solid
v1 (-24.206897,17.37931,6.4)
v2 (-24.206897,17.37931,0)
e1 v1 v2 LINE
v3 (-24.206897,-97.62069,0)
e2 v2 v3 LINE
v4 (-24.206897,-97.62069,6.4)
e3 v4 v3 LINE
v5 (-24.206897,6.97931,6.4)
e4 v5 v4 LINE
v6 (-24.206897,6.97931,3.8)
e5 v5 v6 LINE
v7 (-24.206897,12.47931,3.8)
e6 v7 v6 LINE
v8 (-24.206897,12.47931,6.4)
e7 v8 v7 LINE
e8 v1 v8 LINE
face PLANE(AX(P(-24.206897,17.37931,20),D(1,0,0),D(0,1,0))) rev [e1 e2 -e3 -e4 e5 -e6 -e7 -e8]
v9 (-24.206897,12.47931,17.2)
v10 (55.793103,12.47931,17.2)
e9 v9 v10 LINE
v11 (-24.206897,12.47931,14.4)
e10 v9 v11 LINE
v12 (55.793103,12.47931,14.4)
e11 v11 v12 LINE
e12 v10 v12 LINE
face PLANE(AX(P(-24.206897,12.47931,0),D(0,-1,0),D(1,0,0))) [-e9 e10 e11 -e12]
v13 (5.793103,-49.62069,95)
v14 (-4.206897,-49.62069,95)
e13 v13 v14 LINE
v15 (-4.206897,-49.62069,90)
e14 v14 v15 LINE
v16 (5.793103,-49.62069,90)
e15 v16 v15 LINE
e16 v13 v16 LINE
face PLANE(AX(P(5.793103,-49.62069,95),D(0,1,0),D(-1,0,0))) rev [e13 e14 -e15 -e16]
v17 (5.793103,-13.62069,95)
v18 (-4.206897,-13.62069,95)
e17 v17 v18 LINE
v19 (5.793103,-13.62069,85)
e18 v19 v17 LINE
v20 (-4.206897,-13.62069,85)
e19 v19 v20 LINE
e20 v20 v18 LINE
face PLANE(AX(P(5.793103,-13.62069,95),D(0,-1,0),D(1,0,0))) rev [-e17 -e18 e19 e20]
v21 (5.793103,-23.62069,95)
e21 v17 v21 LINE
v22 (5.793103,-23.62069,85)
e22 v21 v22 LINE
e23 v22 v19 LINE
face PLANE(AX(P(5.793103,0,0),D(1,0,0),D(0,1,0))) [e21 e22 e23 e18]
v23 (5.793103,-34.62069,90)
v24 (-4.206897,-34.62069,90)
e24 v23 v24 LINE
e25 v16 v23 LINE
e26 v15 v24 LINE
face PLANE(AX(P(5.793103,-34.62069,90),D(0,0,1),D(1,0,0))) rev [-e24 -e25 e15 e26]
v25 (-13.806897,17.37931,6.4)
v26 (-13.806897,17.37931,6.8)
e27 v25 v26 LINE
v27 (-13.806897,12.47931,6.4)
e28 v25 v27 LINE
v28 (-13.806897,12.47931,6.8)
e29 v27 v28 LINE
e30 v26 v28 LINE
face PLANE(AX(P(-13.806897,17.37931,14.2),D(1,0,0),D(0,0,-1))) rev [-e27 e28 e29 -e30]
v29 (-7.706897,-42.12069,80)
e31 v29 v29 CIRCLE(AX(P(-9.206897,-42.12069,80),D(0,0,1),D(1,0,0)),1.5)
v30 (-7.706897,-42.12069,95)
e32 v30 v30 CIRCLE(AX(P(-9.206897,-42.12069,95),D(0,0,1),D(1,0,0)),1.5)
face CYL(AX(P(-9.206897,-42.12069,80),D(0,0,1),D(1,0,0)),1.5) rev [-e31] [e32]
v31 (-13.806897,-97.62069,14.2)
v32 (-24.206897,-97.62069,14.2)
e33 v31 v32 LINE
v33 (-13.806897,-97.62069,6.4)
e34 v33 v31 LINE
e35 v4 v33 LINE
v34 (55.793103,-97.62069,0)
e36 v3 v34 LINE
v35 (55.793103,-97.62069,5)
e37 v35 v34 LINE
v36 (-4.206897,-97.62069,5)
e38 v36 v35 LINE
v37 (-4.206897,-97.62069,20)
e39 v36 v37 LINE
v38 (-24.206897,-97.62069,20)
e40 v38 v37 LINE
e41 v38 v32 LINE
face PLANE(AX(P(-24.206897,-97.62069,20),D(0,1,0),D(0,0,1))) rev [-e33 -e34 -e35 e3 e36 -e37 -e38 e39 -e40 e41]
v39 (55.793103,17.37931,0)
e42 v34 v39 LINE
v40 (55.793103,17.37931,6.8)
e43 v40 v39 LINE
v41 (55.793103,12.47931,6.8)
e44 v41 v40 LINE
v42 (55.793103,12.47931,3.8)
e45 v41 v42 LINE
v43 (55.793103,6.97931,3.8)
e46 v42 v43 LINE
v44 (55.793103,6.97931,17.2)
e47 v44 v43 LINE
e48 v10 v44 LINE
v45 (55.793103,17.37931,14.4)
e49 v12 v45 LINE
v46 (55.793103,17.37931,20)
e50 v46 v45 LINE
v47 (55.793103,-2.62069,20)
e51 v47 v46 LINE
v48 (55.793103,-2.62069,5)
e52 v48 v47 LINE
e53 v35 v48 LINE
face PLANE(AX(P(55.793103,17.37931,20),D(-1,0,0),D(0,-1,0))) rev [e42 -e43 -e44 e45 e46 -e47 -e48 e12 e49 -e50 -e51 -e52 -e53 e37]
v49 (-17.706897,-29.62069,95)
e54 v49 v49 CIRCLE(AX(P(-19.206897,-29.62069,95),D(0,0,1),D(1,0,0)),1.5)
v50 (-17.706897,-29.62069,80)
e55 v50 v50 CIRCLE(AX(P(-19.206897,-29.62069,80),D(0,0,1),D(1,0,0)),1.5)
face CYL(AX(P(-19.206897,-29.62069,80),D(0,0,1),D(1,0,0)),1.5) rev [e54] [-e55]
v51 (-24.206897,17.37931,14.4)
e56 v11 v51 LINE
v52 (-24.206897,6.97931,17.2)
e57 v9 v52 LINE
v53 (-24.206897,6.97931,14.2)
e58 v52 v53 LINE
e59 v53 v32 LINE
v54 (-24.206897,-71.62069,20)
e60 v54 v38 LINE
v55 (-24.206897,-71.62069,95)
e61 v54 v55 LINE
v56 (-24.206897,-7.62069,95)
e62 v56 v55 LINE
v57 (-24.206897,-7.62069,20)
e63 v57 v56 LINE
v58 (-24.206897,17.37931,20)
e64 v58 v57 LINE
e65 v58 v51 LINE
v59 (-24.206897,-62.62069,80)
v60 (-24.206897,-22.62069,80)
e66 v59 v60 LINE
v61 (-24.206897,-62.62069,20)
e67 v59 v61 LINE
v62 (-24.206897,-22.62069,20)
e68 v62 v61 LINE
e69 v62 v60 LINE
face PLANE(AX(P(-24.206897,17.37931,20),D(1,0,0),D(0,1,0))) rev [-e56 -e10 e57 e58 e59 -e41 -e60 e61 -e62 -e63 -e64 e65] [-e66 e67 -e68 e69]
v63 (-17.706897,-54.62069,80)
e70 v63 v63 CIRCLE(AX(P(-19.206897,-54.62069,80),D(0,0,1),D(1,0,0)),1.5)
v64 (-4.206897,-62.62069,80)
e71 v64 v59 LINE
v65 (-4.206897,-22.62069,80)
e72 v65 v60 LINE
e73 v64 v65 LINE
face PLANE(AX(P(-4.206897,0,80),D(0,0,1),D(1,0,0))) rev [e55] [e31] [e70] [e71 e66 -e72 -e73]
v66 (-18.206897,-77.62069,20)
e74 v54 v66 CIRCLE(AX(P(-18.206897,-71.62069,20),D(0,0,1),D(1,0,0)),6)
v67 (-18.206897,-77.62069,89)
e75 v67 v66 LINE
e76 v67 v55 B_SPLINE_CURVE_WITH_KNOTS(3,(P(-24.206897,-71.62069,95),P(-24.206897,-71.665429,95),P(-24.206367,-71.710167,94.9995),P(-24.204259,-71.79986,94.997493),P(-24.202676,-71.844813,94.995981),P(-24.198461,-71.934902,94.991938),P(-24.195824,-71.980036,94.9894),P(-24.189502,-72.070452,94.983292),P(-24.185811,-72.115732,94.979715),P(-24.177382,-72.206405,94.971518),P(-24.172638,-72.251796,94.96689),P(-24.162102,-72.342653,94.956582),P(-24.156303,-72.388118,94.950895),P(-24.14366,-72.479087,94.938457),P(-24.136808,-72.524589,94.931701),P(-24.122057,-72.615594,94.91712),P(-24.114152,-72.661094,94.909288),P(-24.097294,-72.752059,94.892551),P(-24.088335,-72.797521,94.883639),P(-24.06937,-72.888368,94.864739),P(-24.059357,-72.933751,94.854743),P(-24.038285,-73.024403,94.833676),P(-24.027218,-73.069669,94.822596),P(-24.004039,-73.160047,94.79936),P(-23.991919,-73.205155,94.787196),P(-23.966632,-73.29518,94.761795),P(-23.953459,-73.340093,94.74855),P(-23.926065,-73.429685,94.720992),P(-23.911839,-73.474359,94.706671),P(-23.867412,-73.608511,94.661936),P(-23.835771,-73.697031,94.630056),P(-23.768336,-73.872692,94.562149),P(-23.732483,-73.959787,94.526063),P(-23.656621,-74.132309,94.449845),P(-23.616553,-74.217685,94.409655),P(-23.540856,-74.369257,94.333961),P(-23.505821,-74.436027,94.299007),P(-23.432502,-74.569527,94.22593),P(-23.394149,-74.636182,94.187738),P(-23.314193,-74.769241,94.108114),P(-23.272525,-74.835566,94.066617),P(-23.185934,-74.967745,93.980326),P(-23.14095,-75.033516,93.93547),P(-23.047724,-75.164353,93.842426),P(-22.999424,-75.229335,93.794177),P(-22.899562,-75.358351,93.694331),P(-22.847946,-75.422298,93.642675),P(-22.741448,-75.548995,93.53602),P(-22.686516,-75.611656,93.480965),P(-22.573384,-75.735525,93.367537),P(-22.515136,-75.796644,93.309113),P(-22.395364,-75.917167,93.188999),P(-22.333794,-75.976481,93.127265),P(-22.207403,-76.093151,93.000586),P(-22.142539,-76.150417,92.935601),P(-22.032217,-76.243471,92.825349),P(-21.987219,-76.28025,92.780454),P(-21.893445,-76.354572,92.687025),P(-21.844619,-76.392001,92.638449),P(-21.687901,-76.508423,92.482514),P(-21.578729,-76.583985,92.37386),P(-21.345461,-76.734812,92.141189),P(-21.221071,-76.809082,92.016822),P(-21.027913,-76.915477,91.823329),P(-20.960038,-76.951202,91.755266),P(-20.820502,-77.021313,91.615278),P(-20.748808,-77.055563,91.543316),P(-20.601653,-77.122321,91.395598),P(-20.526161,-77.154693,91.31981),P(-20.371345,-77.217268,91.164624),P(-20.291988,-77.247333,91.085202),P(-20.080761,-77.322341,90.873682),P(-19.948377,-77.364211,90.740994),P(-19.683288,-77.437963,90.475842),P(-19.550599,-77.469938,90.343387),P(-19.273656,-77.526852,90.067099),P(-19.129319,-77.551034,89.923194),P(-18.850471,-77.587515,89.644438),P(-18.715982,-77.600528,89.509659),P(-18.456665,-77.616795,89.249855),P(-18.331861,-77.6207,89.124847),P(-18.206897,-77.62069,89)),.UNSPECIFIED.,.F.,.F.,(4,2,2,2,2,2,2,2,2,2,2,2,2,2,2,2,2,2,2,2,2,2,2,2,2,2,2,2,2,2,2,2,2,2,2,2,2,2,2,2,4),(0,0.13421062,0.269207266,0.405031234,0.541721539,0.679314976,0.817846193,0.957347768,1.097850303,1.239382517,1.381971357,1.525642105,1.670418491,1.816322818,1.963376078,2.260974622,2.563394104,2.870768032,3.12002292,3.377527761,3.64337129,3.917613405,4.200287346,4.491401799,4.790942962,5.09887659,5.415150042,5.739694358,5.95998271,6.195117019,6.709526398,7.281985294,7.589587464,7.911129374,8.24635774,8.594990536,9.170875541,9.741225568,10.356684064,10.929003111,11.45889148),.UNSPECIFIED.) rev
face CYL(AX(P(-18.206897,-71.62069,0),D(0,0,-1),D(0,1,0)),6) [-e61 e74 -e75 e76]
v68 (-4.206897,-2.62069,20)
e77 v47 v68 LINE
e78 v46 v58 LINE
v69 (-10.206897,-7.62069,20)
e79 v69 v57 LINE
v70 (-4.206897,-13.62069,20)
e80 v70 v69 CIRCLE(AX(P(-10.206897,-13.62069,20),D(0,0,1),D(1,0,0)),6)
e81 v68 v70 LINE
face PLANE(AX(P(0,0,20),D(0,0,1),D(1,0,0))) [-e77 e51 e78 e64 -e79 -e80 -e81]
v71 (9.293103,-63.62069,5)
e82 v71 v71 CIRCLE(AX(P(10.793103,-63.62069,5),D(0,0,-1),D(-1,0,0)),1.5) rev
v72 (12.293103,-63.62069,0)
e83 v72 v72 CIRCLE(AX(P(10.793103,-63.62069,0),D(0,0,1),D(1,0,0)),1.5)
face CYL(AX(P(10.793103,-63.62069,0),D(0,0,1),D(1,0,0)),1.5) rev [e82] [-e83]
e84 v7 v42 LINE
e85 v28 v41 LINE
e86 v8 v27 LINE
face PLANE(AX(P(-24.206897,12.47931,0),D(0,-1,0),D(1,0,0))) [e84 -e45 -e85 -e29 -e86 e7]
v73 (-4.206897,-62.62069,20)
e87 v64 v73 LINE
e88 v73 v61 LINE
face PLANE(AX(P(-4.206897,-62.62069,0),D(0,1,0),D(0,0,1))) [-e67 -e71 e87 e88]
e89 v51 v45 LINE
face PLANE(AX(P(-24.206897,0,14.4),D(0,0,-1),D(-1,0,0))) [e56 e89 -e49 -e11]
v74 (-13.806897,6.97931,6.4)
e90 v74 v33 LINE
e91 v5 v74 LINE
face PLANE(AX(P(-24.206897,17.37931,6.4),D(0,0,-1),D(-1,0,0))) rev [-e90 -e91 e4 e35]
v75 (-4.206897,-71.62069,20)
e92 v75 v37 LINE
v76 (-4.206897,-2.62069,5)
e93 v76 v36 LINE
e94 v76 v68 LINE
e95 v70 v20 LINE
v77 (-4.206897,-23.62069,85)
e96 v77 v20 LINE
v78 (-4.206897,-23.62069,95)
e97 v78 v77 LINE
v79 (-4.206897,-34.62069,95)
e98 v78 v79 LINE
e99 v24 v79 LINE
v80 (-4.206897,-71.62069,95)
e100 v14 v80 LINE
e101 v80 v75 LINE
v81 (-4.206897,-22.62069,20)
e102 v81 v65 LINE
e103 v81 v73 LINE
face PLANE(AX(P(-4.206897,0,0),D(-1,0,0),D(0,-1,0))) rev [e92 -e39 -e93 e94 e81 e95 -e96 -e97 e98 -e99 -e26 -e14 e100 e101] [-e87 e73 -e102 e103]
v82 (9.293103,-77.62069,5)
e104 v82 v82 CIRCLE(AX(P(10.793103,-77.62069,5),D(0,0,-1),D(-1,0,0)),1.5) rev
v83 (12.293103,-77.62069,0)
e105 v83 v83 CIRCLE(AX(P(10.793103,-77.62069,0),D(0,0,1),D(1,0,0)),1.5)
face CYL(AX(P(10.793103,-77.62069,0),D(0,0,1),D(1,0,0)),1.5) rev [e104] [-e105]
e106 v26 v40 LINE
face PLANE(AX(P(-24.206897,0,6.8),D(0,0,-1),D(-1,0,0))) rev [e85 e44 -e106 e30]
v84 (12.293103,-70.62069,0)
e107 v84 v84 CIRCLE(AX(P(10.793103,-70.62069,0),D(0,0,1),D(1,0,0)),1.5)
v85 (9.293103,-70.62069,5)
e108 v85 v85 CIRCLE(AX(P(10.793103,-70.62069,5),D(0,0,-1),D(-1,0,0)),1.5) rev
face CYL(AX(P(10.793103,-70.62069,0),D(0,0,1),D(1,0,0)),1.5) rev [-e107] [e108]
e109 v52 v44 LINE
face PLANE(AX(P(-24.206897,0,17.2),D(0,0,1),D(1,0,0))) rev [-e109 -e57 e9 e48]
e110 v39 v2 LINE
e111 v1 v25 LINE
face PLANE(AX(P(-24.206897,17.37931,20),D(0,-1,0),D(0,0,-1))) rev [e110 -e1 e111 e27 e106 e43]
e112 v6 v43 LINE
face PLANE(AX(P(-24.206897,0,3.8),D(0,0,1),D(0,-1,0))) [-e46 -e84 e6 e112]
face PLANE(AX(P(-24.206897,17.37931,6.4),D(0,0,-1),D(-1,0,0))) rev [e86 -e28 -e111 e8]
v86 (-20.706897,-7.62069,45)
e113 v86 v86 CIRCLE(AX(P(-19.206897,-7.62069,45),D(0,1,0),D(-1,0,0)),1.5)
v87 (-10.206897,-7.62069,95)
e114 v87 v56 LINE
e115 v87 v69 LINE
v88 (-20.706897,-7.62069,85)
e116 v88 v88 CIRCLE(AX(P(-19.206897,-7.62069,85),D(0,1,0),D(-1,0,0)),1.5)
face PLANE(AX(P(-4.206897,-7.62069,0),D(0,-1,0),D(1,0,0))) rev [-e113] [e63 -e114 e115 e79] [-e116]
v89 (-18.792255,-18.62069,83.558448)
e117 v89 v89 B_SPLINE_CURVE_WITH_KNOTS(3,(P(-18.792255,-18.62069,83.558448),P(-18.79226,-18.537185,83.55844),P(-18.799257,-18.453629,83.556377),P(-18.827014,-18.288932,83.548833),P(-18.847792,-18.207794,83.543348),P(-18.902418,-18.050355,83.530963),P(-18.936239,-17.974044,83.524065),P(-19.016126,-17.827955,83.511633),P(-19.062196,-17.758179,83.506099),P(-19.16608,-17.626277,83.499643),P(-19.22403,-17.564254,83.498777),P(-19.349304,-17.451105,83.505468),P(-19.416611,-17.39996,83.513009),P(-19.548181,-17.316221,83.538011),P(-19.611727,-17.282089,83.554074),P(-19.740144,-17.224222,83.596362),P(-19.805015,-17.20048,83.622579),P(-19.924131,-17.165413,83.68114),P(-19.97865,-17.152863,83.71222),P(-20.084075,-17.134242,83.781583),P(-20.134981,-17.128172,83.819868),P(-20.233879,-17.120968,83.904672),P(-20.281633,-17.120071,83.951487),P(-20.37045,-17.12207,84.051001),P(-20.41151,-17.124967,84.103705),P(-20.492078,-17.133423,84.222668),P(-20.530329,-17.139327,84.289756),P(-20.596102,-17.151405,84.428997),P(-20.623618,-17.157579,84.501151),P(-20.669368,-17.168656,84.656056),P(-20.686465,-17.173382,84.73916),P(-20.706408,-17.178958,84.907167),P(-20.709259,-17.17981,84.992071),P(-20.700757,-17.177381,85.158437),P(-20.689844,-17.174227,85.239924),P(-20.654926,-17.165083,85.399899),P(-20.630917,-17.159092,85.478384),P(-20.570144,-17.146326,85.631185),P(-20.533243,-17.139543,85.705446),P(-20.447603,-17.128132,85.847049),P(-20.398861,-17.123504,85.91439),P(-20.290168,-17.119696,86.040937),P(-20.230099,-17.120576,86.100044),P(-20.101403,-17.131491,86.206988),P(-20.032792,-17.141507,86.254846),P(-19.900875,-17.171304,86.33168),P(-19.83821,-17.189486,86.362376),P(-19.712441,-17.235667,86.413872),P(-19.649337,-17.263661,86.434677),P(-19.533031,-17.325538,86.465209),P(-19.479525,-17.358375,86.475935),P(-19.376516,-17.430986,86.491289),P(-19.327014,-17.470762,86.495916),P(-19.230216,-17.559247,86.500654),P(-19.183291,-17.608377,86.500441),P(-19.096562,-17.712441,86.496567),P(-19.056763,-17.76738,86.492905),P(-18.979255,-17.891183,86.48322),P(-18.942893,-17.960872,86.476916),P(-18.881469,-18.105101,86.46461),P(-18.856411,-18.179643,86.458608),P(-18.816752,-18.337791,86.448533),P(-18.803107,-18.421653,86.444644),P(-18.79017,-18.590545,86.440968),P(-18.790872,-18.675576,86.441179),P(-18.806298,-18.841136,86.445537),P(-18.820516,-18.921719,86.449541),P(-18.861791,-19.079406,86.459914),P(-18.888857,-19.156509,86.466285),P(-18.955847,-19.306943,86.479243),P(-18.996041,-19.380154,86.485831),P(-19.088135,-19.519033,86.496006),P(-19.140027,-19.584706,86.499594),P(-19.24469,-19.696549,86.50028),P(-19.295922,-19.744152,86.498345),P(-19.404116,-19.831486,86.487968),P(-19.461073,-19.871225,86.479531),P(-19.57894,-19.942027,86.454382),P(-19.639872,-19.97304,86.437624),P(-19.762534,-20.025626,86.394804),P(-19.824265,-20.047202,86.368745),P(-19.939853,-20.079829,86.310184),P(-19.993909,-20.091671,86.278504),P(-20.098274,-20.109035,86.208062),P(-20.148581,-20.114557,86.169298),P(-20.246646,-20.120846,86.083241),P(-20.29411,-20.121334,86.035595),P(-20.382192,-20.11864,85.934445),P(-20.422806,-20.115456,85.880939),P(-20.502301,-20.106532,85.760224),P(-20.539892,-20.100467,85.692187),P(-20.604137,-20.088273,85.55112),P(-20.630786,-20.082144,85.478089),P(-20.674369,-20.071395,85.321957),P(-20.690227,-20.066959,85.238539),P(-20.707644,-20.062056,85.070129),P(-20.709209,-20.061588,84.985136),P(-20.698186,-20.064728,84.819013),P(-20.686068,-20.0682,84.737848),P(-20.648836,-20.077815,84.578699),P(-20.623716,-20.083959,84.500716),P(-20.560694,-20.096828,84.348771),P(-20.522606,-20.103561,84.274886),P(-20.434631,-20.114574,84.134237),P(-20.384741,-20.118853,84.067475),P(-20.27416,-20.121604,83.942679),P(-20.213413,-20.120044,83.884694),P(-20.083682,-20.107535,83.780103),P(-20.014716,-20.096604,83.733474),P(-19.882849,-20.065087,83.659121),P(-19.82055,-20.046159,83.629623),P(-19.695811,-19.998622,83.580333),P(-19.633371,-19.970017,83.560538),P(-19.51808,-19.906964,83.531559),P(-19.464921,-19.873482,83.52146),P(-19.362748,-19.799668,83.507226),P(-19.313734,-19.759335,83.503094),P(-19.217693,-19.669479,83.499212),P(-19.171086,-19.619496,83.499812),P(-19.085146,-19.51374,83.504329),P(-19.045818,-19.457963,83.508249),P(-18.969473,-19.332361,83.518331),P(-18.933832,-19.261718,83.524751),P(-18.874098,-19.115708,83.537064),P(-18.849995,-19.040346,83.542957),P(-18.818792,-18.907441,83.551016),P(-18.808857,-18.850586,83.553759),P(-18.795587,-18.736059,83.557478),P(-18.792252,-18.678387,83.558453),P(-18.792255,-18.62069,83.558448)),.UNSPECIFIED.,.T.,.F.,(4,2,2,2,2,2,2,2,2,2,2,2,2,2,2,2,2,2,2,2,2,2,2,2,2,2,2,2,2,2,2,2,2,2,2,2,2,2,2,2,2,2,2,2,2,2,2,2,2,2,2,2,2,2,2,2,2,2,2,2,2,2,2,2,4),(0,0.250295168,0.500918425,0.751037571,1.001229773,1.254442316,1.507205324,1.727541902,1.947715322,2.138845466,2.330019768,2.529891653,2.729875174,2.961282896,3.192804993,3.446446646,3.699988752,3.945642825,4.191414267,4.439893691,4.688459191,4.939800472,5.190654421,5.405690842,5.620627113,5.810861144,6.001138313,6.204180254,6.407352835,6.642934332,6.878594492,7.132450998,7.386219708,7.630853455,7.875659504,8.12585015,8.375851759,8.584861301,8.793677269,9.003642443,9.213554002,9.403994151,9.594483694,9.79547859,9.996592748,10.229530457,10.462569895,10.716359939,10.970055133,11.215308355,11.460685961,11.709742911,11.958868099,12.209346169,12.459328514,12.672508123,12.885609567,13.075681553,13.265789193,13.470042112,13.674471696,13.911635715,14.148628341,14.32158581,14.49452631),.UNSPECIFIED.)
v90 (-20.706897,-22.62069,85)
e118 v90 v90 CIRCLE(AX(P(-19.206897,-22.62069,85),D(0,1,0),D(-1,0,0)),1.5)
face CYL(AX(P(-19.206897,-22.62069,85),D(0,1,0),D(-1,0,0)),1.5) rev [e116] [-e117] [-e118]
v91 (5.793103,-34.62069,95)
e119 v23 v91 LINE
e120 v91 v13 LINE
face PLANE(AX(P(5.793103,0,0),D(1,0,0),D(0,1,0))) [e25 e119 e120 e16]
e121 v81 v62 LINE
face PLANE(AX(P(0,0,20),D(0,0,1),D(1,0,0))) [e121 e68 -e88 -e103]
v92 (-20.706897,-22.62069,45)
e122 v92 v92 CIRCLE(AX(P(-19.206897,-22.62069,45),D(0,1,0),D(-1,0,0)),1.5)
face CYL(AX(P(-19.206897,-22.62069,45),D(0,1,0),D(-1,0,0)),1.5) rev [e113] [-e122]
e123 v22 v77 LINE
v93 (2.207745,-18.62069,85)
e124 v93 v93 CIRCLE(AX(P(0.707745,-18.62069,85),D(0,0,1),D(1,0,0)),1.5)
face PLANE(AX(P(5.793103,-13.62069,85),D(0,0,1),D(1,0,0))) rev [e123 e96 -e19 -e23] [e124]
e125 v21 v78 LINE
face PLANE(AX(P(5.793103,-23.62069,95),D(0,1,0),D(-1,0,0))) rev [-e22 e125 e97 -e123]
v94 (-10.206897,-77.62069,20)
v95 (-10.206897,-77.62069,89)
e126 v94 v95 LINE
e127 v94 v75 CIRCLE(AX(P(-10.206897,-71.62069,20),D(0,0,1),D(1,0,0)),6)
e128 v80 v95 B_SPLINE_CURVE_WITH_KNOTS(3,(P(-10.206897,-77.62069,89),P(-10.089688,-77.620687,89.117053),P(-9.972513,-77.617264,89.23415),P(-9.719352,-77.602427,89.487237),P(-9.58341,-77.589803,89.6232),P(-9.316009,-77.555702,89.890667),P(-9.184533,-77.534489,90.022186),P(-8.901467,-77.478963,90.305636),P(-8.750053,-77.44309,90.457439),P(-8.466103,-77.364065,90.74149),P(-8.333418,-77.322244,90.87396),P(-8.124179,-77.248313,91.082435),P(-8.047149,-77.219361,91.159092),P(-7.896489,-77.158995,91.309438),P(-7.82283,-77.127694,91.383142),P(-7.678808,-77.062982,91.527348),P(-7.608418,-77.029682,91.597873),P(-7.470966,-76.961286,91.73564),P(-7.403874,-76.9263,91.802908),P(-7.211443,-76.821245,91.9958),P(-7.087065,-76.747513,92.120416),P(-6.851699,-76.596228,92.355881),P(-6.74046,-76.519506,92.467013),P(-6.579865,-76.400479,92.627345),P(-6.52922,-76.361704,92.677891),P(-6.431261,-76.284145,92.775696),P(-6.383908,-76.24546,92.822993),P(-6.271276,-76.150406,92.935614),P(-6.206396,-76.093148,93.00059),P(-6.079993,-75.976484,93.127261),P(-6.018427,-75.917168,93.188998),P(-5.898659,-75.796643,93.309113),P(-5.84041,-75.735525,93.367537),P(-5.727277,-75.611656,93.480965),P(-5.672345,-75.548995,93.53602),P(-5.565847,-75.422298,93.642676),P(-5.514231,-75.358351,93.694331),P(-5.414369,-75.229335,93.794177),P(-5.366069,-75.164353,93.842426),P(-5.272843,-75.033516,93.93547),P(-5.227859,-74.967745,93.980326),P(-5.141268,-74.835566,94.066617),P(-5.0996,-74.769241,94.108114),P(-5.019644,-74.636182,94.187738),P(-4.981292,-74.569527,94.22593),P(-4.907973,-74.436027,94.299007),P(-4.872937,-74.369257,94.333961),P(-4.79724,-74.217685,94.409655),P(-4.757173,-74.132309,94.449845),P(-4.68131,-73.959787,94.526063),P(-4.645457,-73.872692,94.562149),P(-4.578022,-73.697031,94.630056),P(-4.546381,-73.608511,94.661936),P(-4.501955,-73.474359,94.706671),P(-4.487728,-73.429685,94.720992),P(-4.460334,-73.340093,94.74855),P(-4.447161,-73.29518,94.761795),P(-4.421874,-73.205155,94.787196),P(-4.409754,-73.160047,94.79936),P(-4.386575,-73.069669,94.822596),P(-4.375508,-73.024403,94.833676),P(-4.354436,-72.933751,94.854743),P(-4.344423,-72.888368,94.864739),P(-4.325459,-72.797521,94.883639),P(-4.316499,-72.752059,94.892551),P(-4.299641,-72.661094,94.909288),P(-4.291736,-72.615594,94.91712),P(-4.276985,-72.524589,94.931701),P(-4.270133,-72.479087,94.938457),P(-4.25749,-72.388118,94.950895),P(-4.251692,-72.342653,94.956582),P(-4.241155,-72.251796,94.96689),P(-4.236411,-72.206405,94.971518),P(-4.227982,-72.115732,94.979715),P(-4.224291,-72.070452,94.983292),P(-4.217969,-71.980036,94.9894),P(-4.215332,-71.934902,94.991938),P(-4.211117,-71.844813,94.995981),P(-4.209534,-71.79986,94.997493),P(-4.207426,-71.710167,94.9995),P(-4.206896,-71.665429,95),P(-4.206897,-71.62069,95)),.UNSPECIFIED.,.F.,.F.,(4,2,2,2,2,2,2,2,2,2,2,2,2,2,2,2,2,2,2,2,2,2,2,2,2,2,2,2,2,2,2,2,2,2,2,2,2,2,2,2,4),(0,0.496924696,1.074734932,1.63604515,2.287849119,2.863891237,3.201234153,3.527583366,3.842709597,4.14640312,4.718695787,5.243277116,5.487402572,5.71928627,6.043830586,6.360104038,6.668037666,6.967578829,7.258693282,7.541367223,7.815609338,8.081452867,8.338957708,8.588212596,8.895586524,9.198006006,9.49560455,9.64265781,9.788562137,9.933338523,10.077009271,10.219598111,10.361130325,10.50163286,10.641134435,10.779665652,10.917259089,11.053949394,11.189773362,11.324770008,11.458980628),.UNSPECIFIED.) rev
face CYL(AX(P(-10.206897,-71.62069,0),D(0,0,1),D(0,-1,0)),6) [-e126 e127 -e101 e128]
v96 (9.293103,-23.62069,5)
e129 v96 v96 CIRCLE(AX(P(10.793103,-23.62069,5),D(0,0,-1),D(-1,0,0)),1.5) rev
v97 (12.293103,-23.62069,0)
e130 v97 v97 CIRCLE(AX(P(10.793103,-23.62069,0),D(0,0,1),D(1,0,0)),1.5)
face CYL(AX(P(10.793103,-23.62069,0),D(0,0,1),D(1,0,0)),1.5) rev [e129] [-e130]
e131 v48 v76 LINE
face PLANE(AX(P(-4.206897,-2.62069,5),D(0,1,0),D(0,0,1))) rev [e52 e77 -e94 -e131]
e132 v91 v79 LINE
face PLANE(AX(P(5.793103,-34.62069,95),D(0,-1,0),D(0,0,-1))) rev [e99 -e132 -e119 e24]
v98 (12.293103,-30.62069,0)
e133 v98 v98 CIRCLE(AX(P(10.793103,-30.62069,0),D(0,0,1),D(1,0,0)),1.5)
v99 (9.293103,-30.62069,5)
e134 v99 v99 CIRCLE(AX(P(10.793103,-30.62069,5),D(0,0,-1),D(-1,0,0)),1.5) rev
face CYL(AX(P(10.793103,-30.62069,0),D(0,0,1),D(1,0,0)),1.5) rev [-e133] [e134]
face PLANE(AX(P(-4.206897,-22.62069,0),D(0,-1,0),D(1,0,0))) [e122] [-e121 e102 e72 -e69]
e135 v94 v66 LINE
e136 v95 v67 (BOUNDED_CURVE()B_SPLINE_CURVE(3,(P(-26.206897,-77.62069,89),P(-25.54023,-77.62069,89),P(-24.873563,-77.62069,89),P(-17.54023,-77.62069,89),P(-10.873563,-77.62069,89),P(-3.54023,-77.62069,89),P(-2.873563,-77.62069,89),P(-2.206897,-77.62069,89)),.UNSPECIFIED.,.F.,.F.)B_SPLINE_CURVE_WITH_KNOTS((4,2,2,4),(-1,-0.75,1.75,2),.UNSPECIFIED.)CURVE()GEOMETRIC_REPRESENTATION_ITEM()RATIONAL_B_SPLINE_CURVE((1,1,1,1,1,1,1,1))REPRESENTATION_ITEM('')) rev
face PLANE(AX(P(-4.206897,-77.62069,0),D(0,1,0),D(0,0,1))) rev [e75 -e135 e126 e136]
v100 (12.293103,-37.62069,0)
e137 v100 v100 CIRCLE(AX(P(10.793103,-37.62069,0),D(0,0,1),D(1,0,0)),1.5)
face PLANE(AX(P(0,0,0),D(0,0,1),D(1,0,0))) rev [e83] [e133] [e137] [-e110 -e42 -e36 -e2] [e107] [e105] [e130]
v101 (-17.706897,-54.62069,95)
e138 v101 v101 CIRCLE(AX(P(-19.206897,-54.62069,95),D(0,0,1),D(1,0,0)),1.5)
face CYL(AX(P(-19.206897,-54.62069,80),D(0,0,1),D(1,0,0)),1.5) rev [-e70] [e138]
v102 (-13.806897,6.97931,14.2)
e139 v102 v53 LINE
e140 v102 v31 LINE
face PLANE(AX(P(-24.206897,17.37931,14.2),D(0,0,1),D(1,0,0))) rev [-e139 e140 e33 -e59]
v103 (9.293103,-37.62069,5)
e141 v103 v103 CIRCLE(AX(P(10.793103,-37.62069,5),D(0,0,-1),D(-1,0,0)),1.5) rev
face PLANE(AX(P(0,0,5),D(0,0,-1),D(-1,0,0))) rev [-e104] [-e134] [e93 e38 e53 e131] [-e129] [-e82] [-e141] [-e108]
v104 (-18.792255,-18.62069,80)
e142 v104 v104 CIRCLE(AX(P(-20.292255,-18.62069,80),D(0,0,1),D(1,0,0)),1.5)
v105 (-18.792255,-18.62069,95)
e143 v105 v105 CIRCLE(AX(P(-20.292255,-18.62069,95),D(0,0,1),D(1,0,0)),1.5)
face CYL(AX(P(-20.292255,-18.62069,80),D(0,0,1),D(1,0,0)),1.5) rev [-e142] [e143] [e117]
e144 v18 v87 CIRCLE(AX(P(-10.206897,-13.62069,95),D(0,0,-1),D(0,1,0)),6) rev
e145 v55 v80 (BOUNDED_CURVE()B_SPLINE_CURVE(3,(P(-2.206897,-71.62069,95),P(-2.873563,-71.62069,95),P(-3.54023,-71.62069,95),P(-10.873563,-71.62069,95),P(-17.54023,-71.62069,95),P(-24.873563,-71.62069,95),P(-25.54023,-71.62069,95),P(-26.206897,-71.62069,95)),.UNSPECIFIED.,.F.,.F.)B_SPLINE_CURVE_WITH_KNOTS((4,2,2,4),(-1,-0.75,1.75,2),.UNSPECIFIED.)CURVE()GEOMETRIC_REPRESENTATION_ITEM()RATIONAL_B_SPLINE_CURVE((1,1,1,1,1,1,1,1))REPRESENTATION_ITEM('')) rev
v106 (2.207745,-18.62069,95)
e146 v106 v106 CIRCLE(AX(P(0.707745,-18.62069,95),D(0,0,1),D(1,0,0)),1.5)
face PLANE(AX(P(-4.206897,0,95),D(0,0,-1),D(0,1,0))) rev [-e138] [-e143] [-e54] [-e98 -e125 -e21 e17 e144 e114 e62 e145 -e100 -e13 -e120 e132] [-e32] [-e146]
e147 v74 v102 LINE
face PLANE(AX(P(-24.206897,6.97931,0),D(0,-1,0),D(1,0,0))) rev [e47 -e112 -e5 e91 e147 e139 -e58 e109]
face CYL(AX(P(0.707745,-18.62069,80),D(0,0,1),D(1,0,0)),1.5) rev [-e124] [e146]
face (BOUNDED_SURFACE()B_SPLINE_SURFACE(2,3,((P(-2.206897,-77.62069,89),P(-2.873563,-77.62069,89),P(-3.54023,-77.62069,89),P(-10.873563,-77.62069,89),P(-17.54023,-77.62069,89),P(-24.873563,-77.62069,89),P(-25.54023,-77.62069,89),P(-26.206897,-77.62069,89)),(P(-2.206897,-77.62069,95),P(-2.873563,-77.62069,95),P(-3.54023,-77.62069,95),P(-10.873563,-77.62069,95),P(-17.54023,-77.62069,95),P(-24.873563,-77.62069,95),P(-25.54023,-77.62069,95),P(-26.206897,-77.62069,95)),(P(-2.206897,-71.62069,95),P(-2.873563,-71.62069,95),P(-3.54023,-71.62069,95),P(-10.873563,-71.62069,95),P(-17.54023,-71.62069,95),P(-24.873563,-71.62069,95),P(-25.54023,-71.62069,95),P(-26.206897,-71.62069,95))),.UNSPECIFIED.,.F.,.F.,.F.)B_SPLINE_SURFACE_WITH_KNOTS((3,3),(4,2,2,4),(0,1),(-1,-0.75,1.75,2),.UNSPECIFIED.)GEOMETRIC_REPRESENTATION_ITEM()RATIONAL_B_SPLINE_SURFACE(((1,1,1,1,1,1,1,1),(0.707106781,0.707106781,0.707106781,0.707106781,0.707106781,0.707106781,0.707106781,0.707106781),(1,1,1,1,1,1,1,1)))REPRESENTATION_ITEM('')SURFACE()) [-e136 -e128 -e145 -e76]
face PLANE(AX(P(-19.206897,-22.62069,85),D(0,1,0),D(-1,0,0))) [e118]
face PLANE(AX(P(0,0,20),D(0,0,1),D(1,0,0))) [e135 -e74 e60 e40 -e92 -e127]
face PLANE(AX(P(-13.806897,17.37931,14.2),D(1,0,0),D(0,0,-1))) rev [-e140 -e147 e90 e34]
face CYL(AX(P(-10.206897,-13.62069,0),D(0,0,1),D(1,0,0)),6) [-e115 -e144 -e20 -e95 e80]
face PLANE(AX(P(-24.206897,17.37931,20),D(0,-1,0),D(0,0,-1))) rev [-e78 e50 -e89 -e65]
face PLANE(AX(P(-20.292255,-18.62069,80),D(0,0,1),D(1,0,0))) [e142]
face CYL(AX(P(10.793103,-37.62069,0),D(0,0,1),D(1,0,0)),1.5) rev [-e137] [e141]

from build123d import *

# Parameters (mm, degrees)
SKETCH1_W           = 80
SKETCH1_H           = 115
BOSS_EXTRUDE1_DEPTH = 20
SKETCH2_W           = 60
SKETCH2_H           = 15
BOSS_EXTRUDE2_DEPTH = 20
SKETCH4_W           = 10
SKETCH4_H           = 10
SKETCH4_W_2         = 5
SKETCH4_H_2         = 15
BOSS_EXTRUDE3_DEPTH = 10
SKETCH3_R           = 1.5
CUT_EXTRUDE1_DEPTH  = 15
SKETCH6_R           = 1.5
CUT_EXTRUDE3_DEPTH  = 15
SKETCH7_R           = 1.5
CUT_EXTRUDE4_DEPTH  = 136.157942631
SKETCH8_W           = 60
SKETCH8_H           = 95
CUT_EXTRUDE5_DEPTH  = 15
SKETCH9_W           = 7.6
SKETCH9_H           = 4.9
CUT_EXTRUDE6_DEPTH  = 158.970880442
SKETCH10_W          = 10.4
SKETCH10_H          = 7.8
CUT_EXTRUDE7_DEPTH  = 160.257246025
FILLET1_R           = 6
FILLET2_R           = 6
FILLET3_R           = 6
FILLET4_START       = -25
FILLET4_DEPTH       = 22


with BuildPart() as part:
    # Sketch1 → Boss-Extrude1 (new body)
    with BuildSketch(Plane.XY):
        with Locations((15.793103448, -40.120689655)):
            Rectangle(SKETCH1_W, SKETCH1_H)
    extrude(amount=BOSS_EXTRUDE1_DEPTH)

    # Sketch2 → Boss-Extrude2 (add)
    with BuildSketch(Plane.ZY.offset(24.206896552)):
        with Locations((50, -15.120689655)):
            Rectangle(SKETCH2_W, SKETCH2_H)
        Polygon((80, -7.620689655), (80, -22.620689655), (80, -62.620689655), (80, -77.620689655), (95, -77.620689655), (95, -7.620689655), align=None)
        with Locations((50, -70.120689655)):
            Rectangle(SKETCH2_W, SKETCH2_H)
    extrude(amount=-BOSS_EXTRUDE2_DEPTH)

    # Sketch4 → Boss-Extrude3 (add)
    with BuildSketch(Plane(origin=(-4.206896552, 0, 0), x_dir=(0, 0, -1), z_dir=(1, 0, 0))):
        with Locations((-90, -18.620689655)):
            Rectangle(SKETCH4_W, SKETCH4_H)
        with Locations((-92.5, -42.120689655)):
            Rectangle(SKETCH4_W_2, SKETCH4_H_2)
    extrude(amount=BOSS_EXTRUDE3_DEPTH)

    # Sketch3 → Cut-Extrude1 (cut)
    with BuildSketch(Plane.XY.offset(95)):
        with Locations((0.707744923, -18.620689655)):
            Circle(SKETCH3_R)
        with Locations((-20.292255077, -18.620689655)):
            Circle(SKETCH3_R)
        with Locations((-19.206896552, -29.620689655)):
            Circle(SKETCH3_R)
        with Locations((-19.206896552, -54.620689655)):
            Circle(SKETCH3_R)
        with Locations((-9.206896552, -42.120689655)):
            Circle(SKETCH3_R)
    extrude(amount=-CUT_EXTRUDE1_DEPTH, mode=Mode.SUBTRACT)

    # Sketch6 → Cut-Extrude3 (cut)
    with BuildSketch(Plane(origin=(0, -7.620689655, 0), x_dir=(1, 0, 0), z_dir=(0, 1, 0))):
        with Locations(Location((-19.206896552, -85, 0), (0, 0, 180))):
            Circle(SKETCH6_R)
        with Locations(Location((-19.206896552, -45, 0), (0, 0, 180))):
            Circle(SKETCH6_R)
    extrude(amount=-CUT_EXTRUDE3_DEPTH, mode=Mode.SUBTRACT)

    # Sketch7 → Cut-Extrude4 (cut, through all)
    with BuildSketch(Plane.XY.offset(20)):
        with Locations((10.793103448, -77.620689655)):
            Circle(SKETCH7_R)
        with Locations((10.793103448, -37.620689655)):
            Circle(SKETCH7_R)
        with Locations((10.793103448, -70.620689655)):
            Circle(SKETCH7_R)
        with Locations((10.793103448, -30.620689655)):
            Circle(SKETCH7_R)
        with Locations((10.793103448, -63.620689655)):
            Circle(SKETCH7_R)
        with Locations((10.793103448, -23.620689655)):
            Circle(SKETCH7_R)
    extrude(amount=-CUT_EXTRUDE4_DEPTH, mode=Mode.SUBTRACT)

    # Sketch8 → Cut-Extrude5 (cut)
    with BuildSketch(Plane.XY.offset(20)):
        with Locations((25.793103448, -50.120689655)):
            Rectangle(SKETCH8_W, SKETCH8_H)
    extrude(amount=-CUT_EXTRUDE5_DEPTH, mode=Mode.SUBTRACT)

    # Sketch9 → Cut-Extrude6 (cut, through all)
    with BuildSketch(Plane(origin=(55.793103448, 0, 0), x_dir=(0, 0, -1), z_dir=(1, 0, 0))):
        Polygon((-6.8, 12.479310345), (-14.4, 12.479310345), (-17.2, 12.479310345), (-17.2, 6.979310345), (-3.8, 6.979310345), (-3.8, 12.479310345), align=None)
        with Locations((-10.6, 14.929310345)):
            Rectangle(SKETCH9_W, SKETCH9_H)
    extrude(amount=-CUT_EXTRUDE6_DEPTH, mode=Mode.SUBTRACT)

    # Sketch10 → Cut-Extrude7 (cut, through all)
    with BuildSketch(Plane.XZ.offset(97.620689655)):
        with Locations((-19.006896552, 10.3)):
            Rectangle(SKETCH10_W, SKETCH10_H)
    extrude(amount=-CUT_EXTRUDE7_DEPTH, mode=Mode.SUBTRACT)

    # Fillet1
    fillet1_edges = [part.edges().sort_by_distance(p)[0] for p in [
        (-24.206896552, -77.620689655, 57.5),
    ]]
    fillet(fillet1_edges, radius=FILLET1_R)

    # Fillet2
    fillet2_edges = [part.edges().sort_by_distance(p)[0] for p in [
        (-4.206896552, -77.620689655, 57.5),
    ]]
    fillet(fillet2_edges, radius=FILLET2_R)

    # Fillet3
    fillet3_edges = [part.edges().sort_by_distance(p)[0] for p in [
        (-4.206896552, -7.620689655, 57.5),
    ]]
    fillet(fillet3_edges, radius=FILLET3_R)

    # Fillet4: read off the stored shape, not the designer's step
    # Fillet4 outline → Fillet4 (cut)
    with BuildSketch(Plane.YZ.offset(FILLET4_START)):
        with BuildLine():
            Line((-77.620689655, 95), (-77.620689655, 89))
            add(Edge.make_bspline(
                [(-77.620689655, 89), (-77.620689655, 95), (-71.620689655, 95)],
                knots=[0, 0, 0, 1, 1, 1], degree=2, weights=[1, 0.707106781, 1]))
            Line((-71.620689655, 95), (-77.620689655, 95))
        make_face()
    extrude(amount=FILLET4_DEPTH, mode=Mode.SUBTRACT)


solid = part.part
